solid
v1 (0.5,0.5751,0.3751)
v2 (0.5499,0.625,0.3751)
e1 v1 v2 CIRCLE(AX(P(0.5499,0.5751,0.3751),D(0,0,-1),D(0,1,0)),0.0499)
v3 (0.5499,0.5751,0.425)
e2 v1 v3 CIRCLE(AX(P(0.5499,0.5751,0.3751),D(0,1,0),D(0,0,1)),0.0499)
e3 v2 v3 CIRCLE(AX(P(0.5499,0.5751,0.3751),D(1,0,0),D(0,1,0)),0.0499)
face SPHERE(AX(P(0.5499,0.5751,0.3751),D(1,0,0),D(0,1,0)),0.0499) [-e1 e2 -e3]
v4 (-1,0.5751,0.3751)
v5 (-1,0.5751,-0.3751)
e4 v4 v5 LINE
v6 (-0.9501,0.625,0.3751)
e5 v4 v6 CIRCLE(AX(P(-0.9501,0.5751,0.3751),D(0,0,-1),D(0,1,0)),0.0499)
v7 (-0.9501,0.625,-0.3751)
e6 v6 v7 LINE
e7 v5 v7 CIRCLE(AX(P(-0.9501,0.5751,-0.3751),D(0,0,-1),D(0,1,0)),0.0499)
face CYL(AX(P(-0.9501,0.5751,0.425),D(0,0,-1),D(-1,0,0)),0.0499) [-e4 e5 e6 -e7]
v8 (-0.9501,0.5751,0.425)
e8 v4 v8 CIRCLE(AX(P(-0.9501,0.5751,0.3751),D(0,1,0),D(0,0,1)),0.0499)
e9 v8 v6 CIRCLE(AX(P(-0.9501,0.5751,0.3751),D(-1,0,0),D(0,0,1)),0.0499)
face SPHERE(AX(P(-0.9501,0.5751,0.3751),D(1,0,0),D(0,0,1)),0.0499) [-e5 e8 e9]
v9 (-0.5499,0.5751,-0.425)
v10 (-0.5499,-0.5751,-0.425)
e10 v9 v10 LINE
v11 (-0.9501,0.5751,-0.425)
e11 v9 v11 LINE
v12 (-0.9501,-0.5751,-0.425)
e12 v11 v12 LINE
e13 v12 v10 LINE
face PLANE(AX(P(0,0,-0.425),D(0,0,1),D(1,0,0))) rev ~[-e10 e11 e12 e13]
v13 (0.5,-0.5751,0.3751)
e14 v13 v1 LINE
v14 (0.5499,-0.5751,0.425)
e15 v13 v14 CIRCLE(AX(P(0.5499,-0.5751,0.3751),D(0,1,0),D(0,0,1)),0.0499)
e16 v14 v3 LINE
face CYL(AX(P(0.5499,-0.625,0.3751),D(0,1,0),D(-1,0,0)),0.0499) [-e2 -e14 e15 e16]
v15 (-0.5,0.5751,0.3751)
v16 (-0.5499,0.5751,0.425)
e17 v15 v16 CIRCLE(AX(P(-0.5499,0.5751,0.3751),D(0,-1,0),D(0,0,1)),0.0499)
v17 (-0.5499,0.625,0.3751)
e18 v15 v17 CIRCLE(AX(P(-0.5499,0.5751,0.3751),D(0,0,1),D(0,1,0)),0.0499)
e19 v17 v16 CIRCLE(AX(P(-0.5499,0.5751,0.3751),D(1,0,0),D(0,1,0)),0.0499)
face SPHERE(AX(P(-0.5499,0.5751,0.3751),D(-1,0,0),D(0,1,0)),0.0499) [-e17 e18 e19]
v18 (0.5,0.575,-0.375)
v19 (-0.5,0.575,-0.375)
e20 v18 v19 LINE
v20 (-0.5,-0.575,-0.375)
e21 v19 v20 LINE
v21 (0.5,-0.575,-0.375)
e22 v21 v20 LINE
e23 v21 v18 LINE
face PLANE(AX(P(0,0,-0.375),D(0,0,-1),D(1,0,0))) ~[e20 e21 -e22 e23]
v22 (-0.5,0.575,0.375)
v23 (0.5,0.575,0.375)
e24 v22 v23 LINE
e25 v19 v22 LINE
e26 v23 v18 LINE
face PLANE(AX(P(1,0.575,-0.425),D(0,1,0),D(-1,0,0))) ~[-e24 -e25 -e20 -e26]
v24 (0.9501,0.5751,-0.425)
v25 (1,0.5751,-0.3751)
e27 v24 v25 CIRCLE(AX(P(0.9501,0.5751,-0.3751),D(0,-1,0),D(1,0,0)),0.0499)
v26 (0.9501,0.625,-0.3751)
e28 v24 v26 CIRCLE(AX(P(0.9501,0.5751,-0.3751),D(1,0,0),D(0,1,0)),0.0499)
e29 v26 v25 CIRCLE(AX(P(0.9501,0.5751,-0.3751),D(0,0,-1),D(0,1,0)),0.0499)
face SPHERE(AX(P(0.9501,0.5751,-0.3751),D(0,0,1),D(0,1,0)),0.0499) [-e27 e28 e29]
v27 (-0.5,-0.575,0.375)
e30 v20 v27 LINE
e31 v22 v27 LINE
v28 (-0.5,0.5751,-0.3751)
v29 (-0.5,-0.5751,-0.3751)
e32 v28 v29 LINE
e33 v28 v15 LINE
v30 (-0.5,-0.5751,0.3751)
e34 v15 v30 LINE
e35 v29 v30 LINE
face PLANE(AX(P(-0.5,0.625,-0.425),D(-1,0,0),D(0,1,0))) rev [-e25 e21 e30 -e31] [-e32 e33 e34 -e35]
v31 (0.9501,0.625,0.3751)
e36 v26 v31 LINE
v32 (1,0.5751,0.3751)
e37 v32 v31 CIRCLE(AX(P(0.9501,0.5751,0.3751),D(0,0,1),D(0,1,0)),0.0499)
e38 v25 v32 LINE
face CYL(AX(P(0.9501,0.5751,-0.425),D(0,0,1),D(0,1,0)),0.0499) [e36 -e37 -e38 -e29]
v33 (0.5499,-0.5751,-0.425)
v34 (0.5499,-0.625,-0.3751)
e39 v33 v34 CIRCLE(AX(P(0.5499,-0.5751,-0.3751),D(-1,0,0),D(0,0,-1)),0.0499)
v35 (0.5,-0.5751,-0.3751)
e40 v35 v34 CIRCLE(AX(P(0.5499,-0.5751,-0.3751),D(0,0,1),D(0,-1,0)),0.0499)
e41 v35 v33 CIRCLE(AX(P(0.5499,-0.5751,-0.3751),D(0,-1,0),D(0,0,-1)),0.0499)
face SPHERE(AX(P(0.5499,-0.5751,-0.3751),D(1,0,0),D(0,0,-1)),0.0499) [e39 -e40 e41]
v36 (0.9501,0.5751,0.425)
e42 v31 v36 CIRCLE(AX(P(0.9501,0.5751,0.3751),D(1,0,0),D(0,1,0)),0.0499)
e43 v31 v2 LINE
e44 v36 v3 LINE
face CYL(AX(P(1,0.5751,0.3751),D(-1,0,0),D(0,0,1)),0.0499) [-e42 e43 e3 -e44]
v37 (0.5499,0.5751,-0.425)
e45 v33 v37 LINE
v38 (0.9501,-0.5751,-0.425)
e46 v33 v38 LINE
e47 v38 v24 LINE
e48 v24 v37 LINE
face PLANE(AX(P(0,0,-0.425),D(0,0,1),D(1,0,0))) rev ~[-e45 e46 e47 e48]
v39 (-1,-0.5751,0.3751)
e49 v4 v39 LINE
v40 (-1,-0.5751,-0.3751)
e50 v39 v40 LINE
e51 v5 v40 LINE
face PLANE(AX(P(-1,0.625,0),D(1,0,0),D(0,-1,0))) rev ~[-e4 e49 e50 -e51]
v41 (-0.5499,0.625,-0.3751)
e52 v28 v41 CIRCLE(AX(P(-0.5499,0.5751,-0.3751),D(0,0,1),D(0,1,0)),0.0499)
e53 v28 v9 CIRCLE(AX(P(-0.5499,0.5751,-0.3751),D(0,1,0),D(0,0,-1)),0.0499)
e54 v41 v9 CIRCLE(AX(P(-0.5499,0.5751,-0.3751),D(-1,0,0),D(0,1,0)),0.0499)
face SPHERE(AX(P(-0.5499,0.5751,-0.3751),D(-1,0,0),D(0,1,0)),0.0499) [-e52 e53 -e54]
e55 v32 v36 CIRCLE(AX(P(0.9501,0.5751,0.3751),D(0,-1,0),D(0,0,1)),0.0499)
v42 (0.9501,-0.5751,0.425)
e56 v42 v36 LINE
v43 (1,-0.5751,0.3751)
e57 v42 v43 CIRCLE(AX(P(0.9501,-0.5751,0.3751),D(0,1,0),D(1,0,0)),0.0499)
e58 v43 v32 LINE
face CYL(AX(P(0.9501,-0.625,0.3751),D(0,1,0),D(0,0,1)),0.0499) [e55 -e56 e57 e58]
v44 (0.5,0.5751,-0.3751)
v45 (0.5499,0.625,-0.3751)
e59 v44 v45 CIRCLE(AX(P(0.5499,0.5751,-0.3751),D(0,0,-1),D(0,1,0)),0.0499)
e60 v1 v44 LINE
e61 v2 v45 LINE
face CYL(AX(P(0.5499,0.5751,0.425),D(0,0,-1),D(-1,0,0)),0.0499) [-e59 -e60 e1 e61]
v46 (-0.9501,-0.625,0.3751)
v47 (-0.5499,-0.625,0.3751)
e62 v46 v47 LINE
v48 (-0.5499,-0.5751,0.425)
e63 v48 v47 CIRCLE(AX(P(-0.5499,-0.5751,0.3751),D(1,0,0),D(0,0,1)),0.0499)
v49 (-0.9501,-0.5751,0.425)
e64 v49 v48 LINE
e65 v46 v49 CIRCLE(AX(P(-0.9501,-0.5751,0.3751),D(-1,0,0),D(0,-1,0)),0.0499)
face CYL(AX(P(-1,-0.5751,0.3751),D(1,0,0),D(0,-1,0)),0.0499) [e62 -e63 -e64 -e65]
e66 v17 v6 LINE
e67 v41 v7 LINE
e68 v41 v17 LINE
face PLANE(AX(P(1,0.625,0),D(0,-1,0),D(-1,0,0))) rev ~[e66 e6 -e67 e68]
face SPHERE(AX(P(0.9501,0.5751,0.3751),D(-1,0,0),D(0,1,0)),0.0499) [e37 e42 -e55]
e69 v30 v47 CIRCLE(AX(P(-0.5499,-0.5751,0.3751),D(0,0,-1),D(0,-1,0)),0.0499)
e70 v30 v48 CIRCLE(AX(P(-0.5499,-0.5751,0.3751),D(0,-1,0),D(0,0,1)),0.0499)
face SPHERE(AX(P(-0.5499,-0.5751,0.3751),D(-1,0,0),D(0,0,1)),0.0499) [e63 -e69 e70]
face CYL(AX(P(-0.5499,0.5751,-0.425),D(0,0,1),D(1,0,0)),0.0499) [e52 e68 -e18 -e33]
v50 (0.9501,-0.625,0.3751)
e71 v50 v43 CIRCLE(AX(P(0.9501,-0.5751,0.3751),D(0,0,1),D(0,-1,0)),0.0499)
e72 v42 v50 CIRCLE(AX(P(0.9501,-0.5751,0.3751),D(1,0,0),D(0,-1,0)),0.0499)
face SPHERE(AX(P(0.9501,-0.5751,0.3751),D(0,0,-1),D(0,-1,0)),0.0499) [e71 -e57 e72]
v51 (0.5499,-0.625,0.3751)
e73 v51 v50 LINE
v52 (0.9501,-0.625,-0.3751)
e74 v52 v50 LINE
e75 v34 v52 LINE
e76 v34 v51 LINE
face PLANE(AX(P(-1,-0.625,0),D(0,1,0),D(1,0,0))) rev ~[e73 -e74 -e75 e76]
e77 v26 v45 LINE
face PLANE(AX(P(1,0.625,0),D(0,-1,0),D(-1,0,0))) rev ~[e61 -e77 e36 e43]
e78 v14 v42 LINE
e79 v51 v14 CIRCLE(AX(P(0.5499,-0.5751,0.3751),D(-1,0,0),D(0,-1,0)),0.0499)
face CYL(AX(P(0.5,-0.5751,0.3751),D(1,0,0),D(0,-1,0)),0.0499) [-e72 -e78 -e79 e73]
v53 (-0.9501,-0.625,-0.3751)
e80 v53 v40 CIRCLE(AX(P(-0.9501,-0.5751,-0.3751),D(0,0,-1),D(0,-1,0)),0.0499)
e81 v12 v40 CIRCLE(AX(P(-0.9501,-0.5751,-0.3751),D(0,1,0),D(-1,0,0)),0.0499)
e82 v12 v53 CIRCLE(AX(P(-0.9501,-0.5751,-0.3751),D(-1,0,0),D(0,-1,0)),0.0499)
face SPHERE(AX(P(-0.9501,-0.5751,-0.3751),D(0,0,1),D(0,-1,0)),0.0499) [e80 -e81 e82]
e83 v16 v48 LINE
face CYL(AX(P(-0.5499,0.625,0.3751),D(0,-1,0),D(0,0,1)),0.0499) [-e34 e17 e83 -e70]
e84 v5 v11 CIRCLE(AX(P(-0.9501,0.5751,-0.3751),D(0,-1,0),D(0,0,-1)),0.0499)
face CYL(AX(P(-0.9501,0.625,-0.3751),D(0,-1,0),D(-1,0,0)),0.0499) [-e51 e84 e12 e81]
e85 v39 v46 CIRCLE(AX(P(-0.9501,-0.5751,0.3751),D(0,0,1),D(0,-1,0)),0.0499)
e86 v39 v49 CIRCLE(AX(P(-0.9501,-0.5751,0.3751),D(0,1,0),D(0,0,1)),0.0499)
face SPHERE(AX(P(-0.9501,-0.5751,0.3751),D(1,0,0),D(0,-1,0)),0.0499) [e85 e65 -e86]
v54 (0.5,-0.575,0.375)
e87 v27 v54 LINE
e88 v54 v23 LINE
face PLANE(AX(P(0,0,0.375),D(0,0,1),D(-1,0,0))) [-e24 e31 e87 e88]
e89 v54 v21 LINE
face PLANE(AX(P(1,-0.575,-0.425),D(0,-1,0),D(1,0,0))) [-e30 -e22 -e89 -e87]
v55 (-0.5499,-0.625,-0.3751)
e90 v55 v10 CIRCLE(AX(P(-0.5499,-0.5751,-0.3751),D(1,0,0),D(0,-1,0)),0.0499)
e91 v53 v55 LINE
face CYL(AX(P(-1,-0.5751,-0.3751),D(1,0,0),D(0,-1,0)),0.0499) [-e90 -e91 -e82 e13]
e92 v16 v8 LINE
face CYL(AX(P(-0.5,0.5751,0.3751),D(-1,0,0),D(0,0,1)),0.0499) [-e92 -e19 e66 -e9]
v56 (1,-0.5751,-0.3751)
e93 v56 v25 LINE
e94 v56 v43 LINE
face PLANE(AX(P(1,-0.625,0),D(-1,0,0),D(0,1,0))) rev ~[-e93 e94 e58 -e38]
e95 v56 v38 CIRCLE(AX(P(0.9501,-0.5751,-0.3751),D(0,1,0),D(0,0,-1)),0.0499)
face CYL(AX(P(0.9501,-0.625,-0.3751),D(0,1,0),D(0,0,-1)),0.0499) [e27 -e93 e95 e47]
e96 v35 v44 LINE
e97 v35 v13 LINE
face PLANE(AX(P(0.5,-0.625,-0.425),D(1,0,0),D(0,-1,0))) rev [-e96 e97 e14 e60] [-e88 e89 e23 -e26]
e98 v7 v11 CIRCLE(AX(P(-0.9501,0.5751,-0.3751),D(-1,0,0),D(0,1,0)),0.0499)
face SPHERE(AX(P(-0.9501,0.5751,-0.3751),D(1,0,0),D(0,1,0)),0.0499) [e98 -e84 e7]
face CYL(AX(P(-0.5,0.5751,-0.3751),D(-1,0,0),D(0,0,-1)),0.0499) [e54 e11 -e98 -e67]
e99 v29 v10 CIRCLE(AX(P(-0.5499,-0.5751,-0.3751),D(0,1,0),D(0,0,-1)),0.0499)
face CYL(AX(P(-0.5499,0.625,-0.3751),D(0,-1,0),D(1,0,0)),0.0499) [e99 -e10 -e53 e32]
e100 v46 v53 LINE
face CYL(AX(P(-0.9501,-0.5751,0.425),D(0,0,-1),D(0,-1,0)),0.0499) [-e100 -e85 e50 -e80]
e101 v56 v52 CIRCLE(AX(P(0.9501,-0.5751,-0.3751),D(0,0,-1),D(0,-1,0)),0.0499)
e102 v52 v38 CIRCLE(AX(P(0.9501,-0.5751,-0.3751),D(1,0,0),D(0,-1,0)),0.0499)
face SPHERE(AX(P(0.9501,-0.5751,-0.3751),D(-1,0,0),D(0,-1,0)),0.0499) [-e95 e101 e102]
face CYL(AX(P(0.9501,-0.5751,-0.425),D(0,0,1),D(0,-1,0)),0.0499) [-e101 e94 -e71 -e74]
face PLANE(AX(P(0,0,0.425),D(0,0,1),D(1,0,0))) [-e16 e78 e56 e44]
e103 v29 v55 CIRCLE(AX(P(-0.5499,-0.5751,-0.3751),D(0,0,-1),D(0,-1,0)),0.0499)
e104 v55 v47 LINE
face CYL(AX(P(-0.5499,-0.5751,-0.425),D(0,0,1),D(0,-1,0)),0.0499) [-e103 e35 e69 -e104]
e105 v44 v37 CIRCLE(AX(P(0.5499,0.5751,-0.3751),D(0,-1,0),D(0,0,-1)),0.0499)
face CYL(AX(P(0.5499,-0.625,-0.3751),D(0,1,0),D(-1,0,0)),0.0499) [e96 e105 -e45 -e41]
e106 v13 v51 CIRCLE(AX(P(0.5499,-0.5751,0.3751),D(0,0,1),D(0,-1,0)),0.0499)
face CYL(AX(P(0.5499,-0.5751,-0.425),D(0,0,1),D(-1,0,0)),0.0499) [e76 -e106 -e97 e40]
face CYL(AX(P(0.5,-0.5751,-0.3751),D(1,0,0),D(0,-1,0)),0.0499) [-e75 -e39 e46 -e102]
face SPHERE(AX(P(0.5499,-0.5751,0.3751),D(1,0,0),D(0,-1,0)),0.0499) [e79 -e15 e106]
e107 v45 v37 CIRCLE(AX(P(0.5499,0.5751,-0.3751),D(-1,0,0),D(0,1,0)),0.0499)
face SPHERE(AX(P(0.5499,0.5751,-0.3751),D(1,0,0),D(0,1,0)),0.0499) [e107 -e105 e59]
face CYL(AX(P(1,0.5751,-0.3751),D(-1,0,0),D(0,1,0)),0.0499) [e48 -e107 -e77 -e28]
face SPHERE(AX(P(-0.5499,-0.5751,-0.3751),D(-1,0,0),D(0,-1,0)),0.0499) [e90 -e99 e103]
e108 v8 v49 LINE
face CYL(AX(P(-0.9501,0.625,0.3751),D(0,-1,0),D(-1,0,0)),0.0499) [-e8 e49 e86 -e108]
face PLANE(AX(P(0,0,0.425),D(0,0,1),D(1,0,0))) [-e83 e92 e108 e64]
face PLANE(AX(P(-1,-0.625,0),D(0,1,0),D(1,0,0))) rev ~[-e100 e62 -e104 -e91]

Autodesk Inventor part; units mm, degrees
ref_plane "YZ Plane" through (0, 0, 0) normal (1, 0, 0) x (0, 1, 0)
ref_plane "XZ Plane" through (0, 0, 0) normal (0, 1, 0) x (-1, 0, 0)
ref_plane "XY Plane" through (0, 0, 0) normal (0, 0, 1) x (1, 0, 0)
sketch "Sketch1" plane through (0, 0, 0) normal (0, 0, 1) x (1, 0, 0)
  line L0 (1, 0.625) -> (-1, 0.625)
  line L1 (-1, 0.625) -> (-1, -0.625)
  line L2 (-1, -0.625) -> (1, -0.625)
  line L3 (1, -0.625) -> (1, 0.625)
  line L4 (1, 0.625) -> (-1, -0.625) construction
  line L5 (-1, 0.625) -> (1, -0.625) construction
  point P0 (0, 0)
  point P1 (0, 0)
  point P2 (0, 0)
  dimension "d0" = 2
  dimension "d1" = 1.25
sketch "Sketch1 outline for Extrusion1" plane through (0, 0, 0) normal (0, 0, 1) x (1, 0, 0)
  line L0 (1, -0.625) -> (1, 0.625)
  line L1 (-1, -0.625) -> (1, -0.625)
  line L2 (-1, 0.625) -> (-1, -0.625)
  line L3 (1, 0.625) -> (-1, 0.625)
extrude "Extrusion1" add sketch "Sketch1 outline for Extrusion1" along normal mid plane 0.85
sketch "Sketch2" plane through (0, 0, 0.425) normal (0, 0, 1) x (-1, 0, 0)
  line L0 (0.5, 0.624281) -> (0.5, -0.625)
  line L1 (-0.5, 0.625) -> (-0.5, -0.625)
  line L2 (-0.5, 0.625) -> (0.5, 0.625)
  line L3 (0.5, 0.625) -> (0.5, -0.625)
  line L4 (0.5, -0.625) -> (-0.5, -0.625)
  line L5 (-0.5, -0.625) -> (-0.5, 0.625)
  line L6 (-1, -0.625) -> (1, -0.625)
  line L7 (1, 0.625) -> (-1, 0.625)
  line L8 (1, -0.625) -> (1, 0.625)
  line L9 (-1, 0.625) -> (-1, -0.625)
  point P0 (0, 0)
  dimension "d11" = 0.5
  dimension "d12" = 0.5
sketch "Sketch2 outline for Extrusion2" plane through (0, 0, 0.425) normal (0, 0, 1) x (-1, 0, 0)
  line L0 (-0.5, -0.625) -> (0.5, -0.625)
  line L1 (-0.5, 0.625) -> (-0.5, -0.625)
  line L2 (0.5, 0.625) -> (-0.5, 0.625)
  line L3 (0.5, -0.625) -> (0.5, 0.625)
extrude "Extrusion2" cut sketch "Sketch2 outline for Extrusion2" against normal blind 0.05
mirror "Mirror1" about plane through (0, 0, 0) normal (0, 0, 1) of "Extrusion2"
sketch "Sketch3" plane through (1, -0.625, -0.425) normal (0, -1, 0) x (1, 0, 0)
  line L0 (-1.5, 0.8) -> (-0.5, 0.8)
  line L1 (-0.5, 0.8) -> (-0.5, 0.05)
  line L2 (-0.5, 0.05) -> (-1.5, 0.05)
  line L3 (-1.5, 0.05) -> (-1.5, 0.8)
  point P0 (-1, 0.425)
sketch "Sketch3 outline for Extrusion3" plane through (1, -0.625, -0.425) normal (0, -1, 0) x (1, 0, 0)
  line L0 (-1.5, 0.8) -> (-0.5, 0.8)
  line L1 (-0.5, 0.8) -> (-0.5, 0.05)
  line L2 (-0.5, 0.05) -> (-1.5, 0.05)
  line L3 (-1.5, 0.05) -> (-1.5, 0.8)
extrude "Extrusion3" cut sketch "Sketch3 outline for Extrusion3" against normal blind 0.05
mirror "Mirror2" about plane through (0, 0, 0) normal (0, 1, 0) of "Extrusion3"
fillet "Fillet1" radius 0.05 24 edges at (0.75, 0.625, 0.425) (1, 0.625, 0) (0.75, 0.625, -0.425) (0.75, -0.625, -0.425) (1, -0.625, 0) (0.75, -0.625, 0.425) (-0.75, -0.625, 0.425) (-1, -0.625, 0) (-0.75, -0.625, -0.425) (1, 0, -0.425) (1, 0, 0.425) (-0.75, 0.625, 0.425) (-1, 0, 0.425) (-0.75, 0.625, -0.425) (-1, 0.625, 0) (-1, 0, -0.425) (-0.5, 0.625, 0) (-0.5, 0, 0.425) (-0.5, -0.625, 0) (-0.5, 0, -0.425) (0.5, 0.625, 0) (0.5, 0, -0.425) (0.5, -0.625, 0) (0.5, 0, 0.425)
properties part number "CL21F104ZBCNNNC"
